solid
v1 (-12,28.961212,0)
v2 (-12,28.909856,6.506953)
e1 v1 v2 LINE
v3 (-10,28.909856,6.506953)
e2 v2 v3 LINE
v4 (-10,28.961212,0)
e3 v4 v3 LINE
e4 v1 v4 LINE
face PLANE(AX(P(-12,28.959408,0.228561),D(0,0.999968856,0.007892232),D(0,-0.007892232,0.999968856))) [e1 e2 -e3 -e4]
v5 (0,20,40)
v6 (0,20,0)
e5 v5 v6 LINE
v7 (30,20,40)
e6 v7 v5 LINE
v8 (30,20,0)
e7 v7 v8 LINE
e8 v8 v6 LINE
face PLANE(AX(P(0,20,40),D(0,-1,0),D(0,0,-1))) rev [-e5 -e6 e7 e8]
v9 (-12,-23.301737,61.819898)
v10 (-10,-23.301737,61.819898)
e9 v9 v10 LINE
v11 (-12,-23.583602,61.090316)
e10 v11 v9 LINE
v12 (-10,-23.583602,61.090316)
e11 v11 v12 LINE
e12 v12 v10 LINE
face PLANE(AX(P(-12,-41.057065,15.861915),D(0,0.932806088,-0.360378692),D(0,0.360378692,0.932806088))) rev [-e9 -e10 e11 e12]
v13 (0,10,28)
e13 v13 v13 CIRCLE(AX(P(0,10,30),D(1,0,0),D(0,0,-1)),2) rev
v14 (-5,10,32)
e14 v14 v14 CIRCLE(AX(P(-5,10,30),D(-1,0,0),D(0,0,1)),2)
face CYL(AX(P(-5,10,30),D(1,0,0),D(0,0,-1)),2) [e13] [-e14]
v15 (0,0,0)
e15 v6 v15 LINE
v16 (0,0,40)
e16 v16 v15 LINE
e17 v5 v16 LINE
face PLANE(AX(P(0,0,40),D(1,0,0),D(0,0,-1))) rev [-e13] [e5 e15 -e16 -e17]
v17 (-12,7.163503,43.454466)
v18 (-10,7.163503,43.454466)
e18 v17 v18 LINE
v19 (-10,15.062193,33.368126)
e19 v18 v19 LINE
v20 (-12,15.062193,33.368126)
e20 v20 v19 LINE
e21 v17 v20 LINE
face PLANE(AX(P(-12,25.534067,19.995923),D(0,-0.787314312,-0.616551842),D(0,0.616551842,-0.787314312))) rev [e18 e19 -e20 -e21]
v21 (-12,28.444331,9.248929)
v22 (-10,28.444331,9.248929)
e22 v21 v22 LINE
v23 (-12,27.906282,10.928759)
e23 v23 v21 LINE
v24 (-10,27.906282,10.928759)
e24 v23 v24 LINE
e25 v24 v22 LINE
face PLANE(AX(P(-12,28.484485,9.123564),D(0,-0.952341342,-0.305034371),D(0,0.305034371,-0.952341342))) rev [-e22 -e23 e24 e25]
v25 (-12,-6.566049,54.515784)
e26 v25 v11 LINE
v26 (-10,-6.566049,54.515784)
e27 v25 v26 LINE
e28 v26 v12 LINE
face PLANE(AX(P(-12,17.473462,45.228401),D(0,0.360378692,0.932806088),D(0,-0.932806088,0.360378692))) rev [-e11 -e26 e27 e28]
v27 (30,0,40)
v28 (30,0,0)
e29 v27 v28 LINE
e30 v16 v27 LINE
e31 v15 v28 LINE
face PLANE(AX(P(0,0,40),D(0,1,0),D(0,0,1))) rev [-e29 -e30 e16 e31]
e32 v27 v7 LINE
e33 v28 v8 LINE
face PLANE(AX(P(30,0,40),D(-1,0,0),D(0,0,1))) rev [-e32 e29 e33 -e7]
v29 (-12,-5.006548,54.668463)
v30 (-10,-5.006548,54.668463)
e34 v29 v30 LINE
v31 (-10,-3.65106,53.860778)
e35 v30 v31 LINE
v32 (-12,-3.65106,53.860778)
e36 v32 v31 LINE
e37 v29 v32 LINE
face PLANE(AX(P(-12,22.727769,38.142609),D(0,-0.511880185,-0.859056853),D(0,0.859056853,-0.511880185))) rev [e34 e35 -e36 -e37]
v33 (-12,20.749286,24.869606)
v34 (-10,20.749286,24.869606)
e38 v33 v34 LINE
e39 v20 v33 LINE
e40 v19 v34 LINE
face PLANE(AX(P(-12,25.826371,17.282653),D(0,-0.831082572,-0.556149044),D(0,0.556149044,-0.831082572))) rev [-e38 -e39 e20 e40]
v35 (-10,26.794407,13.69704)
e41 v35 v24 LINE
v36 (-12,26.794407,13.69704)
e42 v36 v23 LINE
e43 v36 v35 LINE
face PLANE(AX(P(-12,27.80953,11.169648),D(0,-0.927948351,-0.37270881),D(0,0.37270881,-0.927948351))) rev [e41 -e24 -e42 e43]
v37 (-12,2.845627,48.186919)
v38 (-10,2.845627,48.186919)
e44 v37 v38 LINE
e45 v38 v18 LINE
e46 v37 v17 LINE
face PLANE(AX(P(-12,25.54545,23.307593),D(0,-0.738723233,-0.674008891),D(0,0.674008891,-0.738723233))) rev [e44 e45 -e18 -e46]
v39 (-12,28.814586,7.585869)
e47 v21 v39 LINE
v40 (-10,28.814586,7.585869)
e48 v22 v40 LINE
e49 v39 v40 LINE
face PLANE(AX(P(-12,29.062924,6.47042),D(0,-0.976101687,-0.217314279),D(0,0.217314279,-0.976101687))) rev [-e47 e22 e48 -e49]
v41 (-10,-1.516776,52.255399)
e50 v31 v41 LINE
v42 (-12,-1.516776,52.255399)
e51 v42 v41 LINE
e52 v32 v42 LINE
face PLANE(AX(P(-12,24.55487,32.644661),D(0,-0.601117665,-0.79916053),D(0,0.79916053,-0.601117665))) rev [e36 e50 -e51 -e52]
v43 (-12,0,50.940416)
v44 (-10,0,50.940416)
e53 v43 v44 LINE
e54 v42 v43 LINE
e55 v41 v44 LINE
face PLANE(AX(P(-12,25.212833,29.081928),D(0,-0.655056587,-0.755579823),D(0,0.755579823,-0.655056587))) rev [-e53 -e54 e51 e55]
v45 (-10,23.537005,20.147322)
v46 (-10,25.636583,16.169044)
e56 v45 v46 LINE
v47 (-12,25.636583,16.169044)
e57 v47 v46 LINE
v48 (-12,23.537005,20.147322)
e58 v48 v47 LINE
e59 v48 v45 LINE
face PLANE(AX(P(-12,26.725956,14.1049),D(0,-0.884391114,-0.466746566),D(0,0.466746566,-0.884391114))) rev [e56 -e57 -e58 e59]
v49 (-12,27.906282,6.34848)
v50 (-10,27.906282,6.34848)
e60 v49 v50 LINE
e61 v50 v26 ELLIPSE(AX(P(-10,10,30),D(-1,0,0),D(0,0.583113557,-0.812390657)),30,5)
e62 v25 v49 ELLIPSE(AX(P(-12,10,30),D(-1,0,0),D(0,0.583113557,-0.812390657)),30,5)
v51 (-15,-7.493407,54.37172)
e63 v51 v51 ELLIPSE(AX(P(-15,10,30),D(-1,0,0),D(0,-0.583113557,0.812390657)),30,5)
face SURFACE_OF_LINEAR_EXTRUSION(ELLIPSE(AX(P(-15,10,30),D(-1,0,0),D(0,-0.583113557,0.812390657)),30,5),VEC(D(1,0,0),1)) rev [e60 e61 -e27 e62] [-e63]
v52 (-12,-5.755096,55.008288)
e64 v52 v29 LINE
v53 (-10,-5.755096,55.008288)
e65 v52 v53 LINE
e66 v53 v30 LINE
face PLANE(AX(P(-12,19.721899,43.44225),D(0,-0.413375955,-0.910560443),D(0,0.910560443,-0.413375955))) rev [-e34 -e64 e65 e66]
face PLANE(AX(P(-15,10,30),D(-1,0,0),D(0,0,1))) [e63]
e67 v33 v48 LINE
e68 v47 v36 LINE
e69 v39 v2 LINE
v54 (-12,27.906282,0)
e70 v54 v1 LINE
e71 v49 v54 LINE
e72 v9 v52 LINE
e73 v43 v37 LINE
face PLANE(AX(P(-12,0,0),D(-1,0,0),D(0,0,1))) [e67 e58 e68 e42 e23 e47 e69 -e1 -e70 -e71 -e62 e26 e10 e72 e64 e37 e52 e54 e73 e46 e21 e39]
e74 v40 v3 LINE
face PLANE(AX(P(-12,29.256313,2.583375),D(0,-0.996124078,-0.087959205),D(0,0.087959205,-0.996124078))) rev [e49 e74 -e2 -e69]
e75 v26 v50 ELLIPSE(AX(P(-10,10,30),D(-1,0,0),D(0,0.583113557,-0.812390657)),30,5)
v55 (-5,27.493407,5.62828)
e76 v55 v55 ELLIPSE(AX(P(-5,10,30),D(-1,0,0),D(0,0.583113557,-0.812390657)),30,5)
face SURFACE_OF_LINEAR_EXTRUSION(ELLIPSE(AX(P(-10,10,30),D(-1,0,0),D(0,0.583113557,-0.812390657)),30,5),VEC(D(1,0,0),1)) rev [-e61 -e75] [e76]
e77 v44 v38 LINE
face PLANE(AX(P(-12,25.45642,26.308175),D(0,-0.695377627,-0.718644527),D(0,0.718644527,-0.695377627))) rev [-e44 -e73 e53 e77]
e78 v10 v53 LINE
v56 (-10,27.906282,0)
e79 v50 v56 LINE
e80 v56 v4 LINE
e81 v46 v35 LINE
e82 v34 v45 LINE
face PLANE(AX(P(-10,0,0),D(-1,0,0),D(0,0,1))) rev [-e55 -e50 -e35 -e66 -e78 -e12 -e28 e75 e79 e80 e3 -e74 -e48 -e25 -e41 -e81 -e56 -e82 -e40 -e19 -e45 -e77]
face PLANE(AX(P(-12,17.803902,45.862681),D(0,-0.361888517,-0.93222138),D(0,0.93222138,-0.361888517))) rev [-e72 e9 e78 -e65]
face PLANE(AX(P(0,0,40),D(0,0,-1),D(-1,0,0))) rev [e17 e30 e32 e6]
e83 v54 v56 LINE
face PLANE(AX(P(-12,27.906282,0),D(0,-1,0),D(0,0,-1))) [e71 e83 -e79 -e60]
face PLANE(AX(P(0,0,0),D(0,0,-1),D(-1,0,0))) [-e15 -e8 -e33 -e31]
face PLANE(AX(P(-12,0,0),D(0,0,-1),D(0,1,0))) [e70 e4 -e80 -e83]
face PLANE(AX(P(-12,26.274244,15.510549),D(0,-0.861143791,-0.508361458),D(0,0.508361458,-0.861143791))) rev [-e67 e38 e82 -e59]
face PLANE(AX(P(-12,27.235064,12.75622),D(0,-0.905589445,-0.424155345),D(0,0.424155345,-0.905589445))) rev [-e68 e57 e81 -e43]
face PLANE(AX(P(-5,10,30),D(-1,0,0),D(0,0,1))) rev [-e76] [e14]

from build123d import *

# Parameters (mm, degrees)
SKETCH_1_W      = 30
SKETCH_1_H      = 20
EXTRUDE_1_DEPTH = 40
SKETCH_2_R      = 2
EXTRUDE_2_DEPTH = 5
SKETCH_3_RX     = 30
SKETCH_3_RY     = 5
EXTRUDE_3_DEPTH = 5
EXTRUDE_4_DEPTH = 2
EXTRUDE_5_DEPTH = 5


# Read off the part's stored shape, not the designer's step: 凸台-拉伸5
with BuildPart() as part:
    # 草图1 → 凸台-拉伸1 (new body)
    with BuildSketch(Plane.XY):
        with Locations((15, 10)):
            Rectangle(SKETCH_1_W, SKETCH_1_H)
    extrude(amount=EXTRUDE_1_DEPTH)

    # 草图2 → 凸台-拉伸2 (add)
    with BuildSketch(Plane.ZY):
        with Locations(Location((30, 10, 0), (0, 0, 180))):
            Circle(SKETCH_2_R)
    extrude(amount=EXTRUDE_2_DEPTH)

    # 草图3 → 凸台-拉伸3 (add)
    with BuildSketch(Plane.ZY.offset(5)):
        with Locations(Location((30, 10), (0, 0, 144.330167024))):
            Ellipse(SKETCH_3_RX, SKETCH_3_RY)
    extrude(amount=EXTRUDE_3_DEPTH)



with BuildPart() as body_2:
    # 草图4 → 凸台-拉伸4 (new body)
    with BuildSketch(Plane.ZY.offset(10)):
        with BuildLine():
            add(Edge.make_bspline(
                [(6.506952715, 28.909855834), (5.513332822, 28.917697958), (4.992779523, 28.561751889)],
                knots=[6.015569415, 6.015569415, 6.015569415, 6.212983263, 6.212983263, 6.212983263], degree=2, weights=[1, 0.995132426, 1]))
            Line((4.992779523, 28.561751889), (7.137480457, 27.953085866))
            add(Edge.make_bspline(
                [(8.41739908, 27.759268462), (7.691843708, 27.924954947), (7.137480457, 27.953085866)],
                knots=[5.905821209, 5.905821209, 5.905821209, 6.029787374, 6.029787374, 6.029787374], degree=2, weights=[1, 0.998079664, 1]))
            add(Edge.make_bspline(
                [(9.931154304, 27.32571063), (9.102712315, 27.602771598), (8.41739908, 27.759268462)],
                knots=[5.788714528, 5.788714528, 5.788714528, 5.905821209, 5.905821209, 5.905821209], degree=2, weights=[1, 0.998286243, 1]))
            add(Edge.make_bspline(
                [(12.213928034, 26.448131332), (10.970222869, 26.978208516), (9.931154304, 27.32571063)],
                knots=[5.641930178, 5.641930178, 5.641930178, 5.788714528, 5.788714528, 5.788714528], degree=2, weights=[1, 0.997308003, 1]))
            add(Edge.make_bspline(
                [(17.511716763, 23.85284507), (14.569327703, 25.444240976), (12.213928034, 26.448131332)],
                knots=[5.365220638, 5.365220638, 5.365220638, 5.641930178, 5.641930178, 5.641930178], degree=2, weights=[1, 0.990444236, 1]))
            add(Edge.make_bspline(
                [(21.663153618, 21.483483589), (19.49565109, 22.779830964), (17.511716763, 23.85284507)],
                knots=[5.17799572, 5.17799572, 5.17799572, 5.365220638, 5.365220638, 5.365220638], degree=2, weights=[1, 0.995621553, 1]))
            add(Edge.make_bspline(
                [(28.161833123, 17.358582765), (24.817516303, 19.596911494), (21.663153618, 21.483483589)],
                knots=[4.906410628, 4.906410628, 4.906410628, 5.17799572, 5.17799572, 5.17799572], degree=2, weights=[1, 0.990794351, 1]))
            add(Edge.make_bspline(
                [(31.719121271, 14.913354973), (29.940162996, 16.168358555), (28.161833123, 17.358582765)],
                knots=[4.761356742, 4.761356742, 4.761356742, 4.906410628, 4.906410628, 4.906410628], degree=2, weights=[1, 0.997371074, 1]))
            add(Edge.make_bspline(
                [(37.988291289, 10.282541681), (34.937566868, 12.642834742), (31.719121271, 14.913354973)],
                knots=[4.4999664, 4.4999664, 4.4999664, 4.761356742, 4.761356742, 4.761356742], degree=2, weights=[1, 0.991471536, 1]))
            add(Edge.make_bspline(
                [(44.627089911, 4.844191407), (41.578227004, 7.505070109), (37.988291289, 10.282541681)],
                knots=[4.193044565, 4.193044565, 4.193044565, 4.4999664, 4.4999664, 4.4999664], degree=2, weights=[1, 0.988247964, 1]))
            add(Edge.make_bspline(
                [(50.343902664, -0.577200355), (47.99639472, 1.903648758), (44.627089911, 4.844191407)],
                knots=[3.854449116, 3.854449116, 3.854449116, 4.193044565, 4.193044565, 4.193044565], degree=2, weights=[1, 0.985703337, 1]))
            add(Edge.make_bspline(
                [(52.4832091, -3.016334631), (51.589789327, -1.893854823), (50.343902664, -0.577200355)],
                knots=[3.673505786, 3.673505786, 3.673505786, 3.854449116, 3.854449116, 3.854449116], degree=2, weights=[1, 0.99591023, 1]))
            add(Edge.make_bspline(
                [(53.450493398, -4.328804293), (53.040359197, -3.716330033), (52.4832091, -3.016334631)],
                knots=[3.56047839, 3.56047839, 3.56047839, 3.673505786, 3.673505786, 3.673505786], degree=2, weights=[1, 0.998403526, 1]))
            add(Edge.make_bspline(
                [(54.25730413, -5.755095942), (53.982230556, -5.122874432), (53.450493398, -4.328804293)],
                knots=[3.414044896, 3.414044896, 3.414044896, 3.56047839, 3.56047839, 3.56047839], degree=2, weights=[1, 0.997320851, 1]))
            add(Edge.make_bspline(
                [(54.515784231, -6.566048985), (54.452837221, -6.2045038), (54.25730413, -5.755095942)],
                knots=[3.309862159, 3.309862159, 3.309862159, 3.414044896, 3.414044896, 3.414044896], degree=2, weights=[1, 0.998643551, 1]))
            Line((54.515784231, -6.566048985), (55.035975621, -7.912515095))
            add(Edge.make_bspline(
                [(55.035975621, -7.912515095), (55.571319453, -7.205458838), (55.0082883, -5.755095942)],
                knots=[3.136655758, 3.136655758, 3.136655758, 3.430060288, 3.430060288, 3.430060288], degree=2, weights=[1, 0.989258508, 1]))
            Line((55.0082883, -5.755095942), (54.668462814, -5.006548181))
            Line((54.668462814, -5.006548181), (53.860777814, -3.651060405))
            Line((53.860777814, -3.651060405), (52.255398503, -1.516776462))
            Line((52.255398503, -1.516776462), (50.940415781, 0))
            Line((50.940415781, 0), (48.186919212, 2.84562684))
            Line((48.186919212, 2.84562684), (43.454466091, 7.163503062))
            Line((43.454466091, 7.163503062), (33.368126059, 15.062192859))
            Line((33.368126059, 15.062192859), (24.869605616, 20.749286032))
            Line((24.869605616, 20.749286032), (20.147321799, 23.537005238))
            Line((20.147321799, 23.537005238), (16.169043828, 25.636582623))
            Line((16.169043828, 25.636582623), (13.69703985, 26.794407183))
            Line((13.69703985, 26.794407183), (10.928759246, 27.90628218))
            Line((10.928759246, 27.90628218), (9.248929013, 28.444330815))
            Line((9.248929013, 28.444330815), (7.585869147, 28.814585944))
            Line((7.585869147, 28.814585944), (6.506952715, 28.909855834))
        make_face()
        with BuildLine():
            Line((3.687796669, 28.932105961), (4.992779523, 28.561751889))
            add(Edge.make_bspline(
                [(6.506952715, 28.909855834), (5.513332822, 28.917697958), (4.992779523, 28.561751889)],
                knots=[6.015569415, 6.015569415, 6.015569415, 6.212983263, 6.212983263, 6.212983263], degree=2, weights=[1, 0.995132426, 1]))
            Line((6.506952715, 28.909855834), (3.687796669, 28.932105961))
        make_face()
        with BuildLine():
            Line((0, 28.264369192), (4.685334353, 28.264369192))
            add(Edge.make_bspline(
                [(4.992779523, 28.561751889), (4.808192105, 28.435533949), (4.685334353, 28.264369192)],
                knots=[6.212983263, 6.212983263, 6.212983263, 6.283185307, 6.283185307, 6.283185307], degree=2, weights=[1, 0.999384022, 1]))
            Line((4.992779523, 28.561751889), (3.687796669, 28.932105961))
            Line((3.687796669, 28.932105961), (0, 28.961211815))
            Line((0, 28.961211815), (0, 28.264369192))
        make_face()
        with BuildLine():
            add(Edge.make_bspline(
                [(4.685334353, 28.264369192), (4.57062955, 28.10456308), (4.510252037, 27.90628218)],
                knots=[0, 0, 0, 0.065546828, 0.065546828, 0.065546828], degree=2, weights=[1, 0.999463, 1]))
            Line((4.685334353, 28.264369192), (0, 28.264369192))
            Line((0, 28.264369192), (0, 27.90628218))
            Line((0, 27.90628218), (4.510252037, 27.90628218))
        make_face()
        with BuildLine():
            add(Edge.make_bspline(
                [(4.992779523, 28.561751889), (4.808192105, 28.435533949), (4.685334353, 28.264369192)],
                knots=[6.212983263, 6.212983263, 6.212983263, 6.283185307, 6.283185307, 6.283185307], degree=2, weights=[1, 0.999384022, 1]))
            add(Edge.make_bspline(
                [(4.685334353, 28.264369192), (4.57062955, 28.10456308), (4.510252037, 27.90628218)],
                knots=[0, 0, 0, 0.065546828, 0.065546828, 0.065546828], degree=2, weights=[1, 0.999463, 1]))
            Line((4.510252037, 27.90628218), (6.34848035, 27.90628218))
            add(Edge.make_bspline(
                [(7.137480457, 27.953085866), (6.682690118, 27.976164001), (6.34848035, 27.90628218)],
                knots=[6.029787374, 6.029787374, 6.029787374, 6.131529727, 6.131529727, 6.131529727], degree=2, weights=[1, 0.998706341, 1]))
            Line((7.137480457, 27.953085866), (4.992779523, 28.561751889))
        make_face()
        with BuildLine():
            add(Edge.make_bspline(
                [(55.035975621, -7.912515095), (55.571319453, -7.205458838), (55.0082883, -5.755095942)],
                knots=[3.136655758, 3.136655758, 3.136655758, 3.430060288, 3.430060288, 3.430060288], degree=2, weights=[1, 0.989258508, 1]))
            Line((55.035975621, -7.912515095), (61.090316434, -23.583602479))
            Line((61.090316434, -23.583602479), (61.819897807, -23.301737273))
            Line((61.819897807, -23.301737273), (55.0082883, -5.755095942))
        make_face()
    extrude(amount=EXTRUDE_4_DEPTH)


with BuildPart() as part_1:
    add(part.part)

    add(body_2.part)  # 凸台-拉伸5 merges body 2
    # 凸台-拉伸5 outline → 凸台-拉伸5 (add)
    with BuildSketch(Plane.ZY.offset(10)):
        with BuildLine():
            add(Edge.make_bspline(
                [(54.371719706, -7.493406717), (54.465505659, -7.362744634), (54.529944837, -7.206425025), (54.561913477, -7.022620585), (54.558192199, -6.809625231), (54.202681657, -4.767699434), (51.727605158, -1.240686466), (46.200440793, 4.025468627), (39.039651813, 9.679286683), (26.386377317, 18.734970385), (18.758776419, 23.664893419), (12.075170793, 27.137730816), (8.050806871, 28.262231314), (4.642942369, 27.549661544), (4.877580773, 25.652182817), (7.730736464, 22.205445776), (11.438087078, 18.596318521), (22.095709136, 9.277375664), (34.757298876, -0.521475217), (47.784810652, -8.095593664), (53.361737398, -8.90050861), (54.371719706, -7.493406717)],
                knots=[0, 0, 0, 0, 0, 0, 0.194483448, 0.194483448, 0.194483448, 0.194483448, 1.630375604, 1.630375604, 1.630375604, 1.630375604, 3.066267761, 3.066267761, 3.066267761, 3.066267761, 4.504868745, 4.504868745, 4.504868745, 4.504868745, 7.04748776, 7.04748776, 7.04748776, 7.04748776, 7.04748776, 7.04748776], degree=5, weights=[1, 1, 1.000007219, 1.000006403, 1, 1, 0.977216815, 0.977216815, 1, 1, 0.977216815, 0.977216815, 1, 1, 0.990702131, 0.997630061, 1, 1, 0.9, 0.9, 1, 1]))
        make_face()
    extrude(amount=EXTRUDE_5_DEPTH)


solid = part_1.part
